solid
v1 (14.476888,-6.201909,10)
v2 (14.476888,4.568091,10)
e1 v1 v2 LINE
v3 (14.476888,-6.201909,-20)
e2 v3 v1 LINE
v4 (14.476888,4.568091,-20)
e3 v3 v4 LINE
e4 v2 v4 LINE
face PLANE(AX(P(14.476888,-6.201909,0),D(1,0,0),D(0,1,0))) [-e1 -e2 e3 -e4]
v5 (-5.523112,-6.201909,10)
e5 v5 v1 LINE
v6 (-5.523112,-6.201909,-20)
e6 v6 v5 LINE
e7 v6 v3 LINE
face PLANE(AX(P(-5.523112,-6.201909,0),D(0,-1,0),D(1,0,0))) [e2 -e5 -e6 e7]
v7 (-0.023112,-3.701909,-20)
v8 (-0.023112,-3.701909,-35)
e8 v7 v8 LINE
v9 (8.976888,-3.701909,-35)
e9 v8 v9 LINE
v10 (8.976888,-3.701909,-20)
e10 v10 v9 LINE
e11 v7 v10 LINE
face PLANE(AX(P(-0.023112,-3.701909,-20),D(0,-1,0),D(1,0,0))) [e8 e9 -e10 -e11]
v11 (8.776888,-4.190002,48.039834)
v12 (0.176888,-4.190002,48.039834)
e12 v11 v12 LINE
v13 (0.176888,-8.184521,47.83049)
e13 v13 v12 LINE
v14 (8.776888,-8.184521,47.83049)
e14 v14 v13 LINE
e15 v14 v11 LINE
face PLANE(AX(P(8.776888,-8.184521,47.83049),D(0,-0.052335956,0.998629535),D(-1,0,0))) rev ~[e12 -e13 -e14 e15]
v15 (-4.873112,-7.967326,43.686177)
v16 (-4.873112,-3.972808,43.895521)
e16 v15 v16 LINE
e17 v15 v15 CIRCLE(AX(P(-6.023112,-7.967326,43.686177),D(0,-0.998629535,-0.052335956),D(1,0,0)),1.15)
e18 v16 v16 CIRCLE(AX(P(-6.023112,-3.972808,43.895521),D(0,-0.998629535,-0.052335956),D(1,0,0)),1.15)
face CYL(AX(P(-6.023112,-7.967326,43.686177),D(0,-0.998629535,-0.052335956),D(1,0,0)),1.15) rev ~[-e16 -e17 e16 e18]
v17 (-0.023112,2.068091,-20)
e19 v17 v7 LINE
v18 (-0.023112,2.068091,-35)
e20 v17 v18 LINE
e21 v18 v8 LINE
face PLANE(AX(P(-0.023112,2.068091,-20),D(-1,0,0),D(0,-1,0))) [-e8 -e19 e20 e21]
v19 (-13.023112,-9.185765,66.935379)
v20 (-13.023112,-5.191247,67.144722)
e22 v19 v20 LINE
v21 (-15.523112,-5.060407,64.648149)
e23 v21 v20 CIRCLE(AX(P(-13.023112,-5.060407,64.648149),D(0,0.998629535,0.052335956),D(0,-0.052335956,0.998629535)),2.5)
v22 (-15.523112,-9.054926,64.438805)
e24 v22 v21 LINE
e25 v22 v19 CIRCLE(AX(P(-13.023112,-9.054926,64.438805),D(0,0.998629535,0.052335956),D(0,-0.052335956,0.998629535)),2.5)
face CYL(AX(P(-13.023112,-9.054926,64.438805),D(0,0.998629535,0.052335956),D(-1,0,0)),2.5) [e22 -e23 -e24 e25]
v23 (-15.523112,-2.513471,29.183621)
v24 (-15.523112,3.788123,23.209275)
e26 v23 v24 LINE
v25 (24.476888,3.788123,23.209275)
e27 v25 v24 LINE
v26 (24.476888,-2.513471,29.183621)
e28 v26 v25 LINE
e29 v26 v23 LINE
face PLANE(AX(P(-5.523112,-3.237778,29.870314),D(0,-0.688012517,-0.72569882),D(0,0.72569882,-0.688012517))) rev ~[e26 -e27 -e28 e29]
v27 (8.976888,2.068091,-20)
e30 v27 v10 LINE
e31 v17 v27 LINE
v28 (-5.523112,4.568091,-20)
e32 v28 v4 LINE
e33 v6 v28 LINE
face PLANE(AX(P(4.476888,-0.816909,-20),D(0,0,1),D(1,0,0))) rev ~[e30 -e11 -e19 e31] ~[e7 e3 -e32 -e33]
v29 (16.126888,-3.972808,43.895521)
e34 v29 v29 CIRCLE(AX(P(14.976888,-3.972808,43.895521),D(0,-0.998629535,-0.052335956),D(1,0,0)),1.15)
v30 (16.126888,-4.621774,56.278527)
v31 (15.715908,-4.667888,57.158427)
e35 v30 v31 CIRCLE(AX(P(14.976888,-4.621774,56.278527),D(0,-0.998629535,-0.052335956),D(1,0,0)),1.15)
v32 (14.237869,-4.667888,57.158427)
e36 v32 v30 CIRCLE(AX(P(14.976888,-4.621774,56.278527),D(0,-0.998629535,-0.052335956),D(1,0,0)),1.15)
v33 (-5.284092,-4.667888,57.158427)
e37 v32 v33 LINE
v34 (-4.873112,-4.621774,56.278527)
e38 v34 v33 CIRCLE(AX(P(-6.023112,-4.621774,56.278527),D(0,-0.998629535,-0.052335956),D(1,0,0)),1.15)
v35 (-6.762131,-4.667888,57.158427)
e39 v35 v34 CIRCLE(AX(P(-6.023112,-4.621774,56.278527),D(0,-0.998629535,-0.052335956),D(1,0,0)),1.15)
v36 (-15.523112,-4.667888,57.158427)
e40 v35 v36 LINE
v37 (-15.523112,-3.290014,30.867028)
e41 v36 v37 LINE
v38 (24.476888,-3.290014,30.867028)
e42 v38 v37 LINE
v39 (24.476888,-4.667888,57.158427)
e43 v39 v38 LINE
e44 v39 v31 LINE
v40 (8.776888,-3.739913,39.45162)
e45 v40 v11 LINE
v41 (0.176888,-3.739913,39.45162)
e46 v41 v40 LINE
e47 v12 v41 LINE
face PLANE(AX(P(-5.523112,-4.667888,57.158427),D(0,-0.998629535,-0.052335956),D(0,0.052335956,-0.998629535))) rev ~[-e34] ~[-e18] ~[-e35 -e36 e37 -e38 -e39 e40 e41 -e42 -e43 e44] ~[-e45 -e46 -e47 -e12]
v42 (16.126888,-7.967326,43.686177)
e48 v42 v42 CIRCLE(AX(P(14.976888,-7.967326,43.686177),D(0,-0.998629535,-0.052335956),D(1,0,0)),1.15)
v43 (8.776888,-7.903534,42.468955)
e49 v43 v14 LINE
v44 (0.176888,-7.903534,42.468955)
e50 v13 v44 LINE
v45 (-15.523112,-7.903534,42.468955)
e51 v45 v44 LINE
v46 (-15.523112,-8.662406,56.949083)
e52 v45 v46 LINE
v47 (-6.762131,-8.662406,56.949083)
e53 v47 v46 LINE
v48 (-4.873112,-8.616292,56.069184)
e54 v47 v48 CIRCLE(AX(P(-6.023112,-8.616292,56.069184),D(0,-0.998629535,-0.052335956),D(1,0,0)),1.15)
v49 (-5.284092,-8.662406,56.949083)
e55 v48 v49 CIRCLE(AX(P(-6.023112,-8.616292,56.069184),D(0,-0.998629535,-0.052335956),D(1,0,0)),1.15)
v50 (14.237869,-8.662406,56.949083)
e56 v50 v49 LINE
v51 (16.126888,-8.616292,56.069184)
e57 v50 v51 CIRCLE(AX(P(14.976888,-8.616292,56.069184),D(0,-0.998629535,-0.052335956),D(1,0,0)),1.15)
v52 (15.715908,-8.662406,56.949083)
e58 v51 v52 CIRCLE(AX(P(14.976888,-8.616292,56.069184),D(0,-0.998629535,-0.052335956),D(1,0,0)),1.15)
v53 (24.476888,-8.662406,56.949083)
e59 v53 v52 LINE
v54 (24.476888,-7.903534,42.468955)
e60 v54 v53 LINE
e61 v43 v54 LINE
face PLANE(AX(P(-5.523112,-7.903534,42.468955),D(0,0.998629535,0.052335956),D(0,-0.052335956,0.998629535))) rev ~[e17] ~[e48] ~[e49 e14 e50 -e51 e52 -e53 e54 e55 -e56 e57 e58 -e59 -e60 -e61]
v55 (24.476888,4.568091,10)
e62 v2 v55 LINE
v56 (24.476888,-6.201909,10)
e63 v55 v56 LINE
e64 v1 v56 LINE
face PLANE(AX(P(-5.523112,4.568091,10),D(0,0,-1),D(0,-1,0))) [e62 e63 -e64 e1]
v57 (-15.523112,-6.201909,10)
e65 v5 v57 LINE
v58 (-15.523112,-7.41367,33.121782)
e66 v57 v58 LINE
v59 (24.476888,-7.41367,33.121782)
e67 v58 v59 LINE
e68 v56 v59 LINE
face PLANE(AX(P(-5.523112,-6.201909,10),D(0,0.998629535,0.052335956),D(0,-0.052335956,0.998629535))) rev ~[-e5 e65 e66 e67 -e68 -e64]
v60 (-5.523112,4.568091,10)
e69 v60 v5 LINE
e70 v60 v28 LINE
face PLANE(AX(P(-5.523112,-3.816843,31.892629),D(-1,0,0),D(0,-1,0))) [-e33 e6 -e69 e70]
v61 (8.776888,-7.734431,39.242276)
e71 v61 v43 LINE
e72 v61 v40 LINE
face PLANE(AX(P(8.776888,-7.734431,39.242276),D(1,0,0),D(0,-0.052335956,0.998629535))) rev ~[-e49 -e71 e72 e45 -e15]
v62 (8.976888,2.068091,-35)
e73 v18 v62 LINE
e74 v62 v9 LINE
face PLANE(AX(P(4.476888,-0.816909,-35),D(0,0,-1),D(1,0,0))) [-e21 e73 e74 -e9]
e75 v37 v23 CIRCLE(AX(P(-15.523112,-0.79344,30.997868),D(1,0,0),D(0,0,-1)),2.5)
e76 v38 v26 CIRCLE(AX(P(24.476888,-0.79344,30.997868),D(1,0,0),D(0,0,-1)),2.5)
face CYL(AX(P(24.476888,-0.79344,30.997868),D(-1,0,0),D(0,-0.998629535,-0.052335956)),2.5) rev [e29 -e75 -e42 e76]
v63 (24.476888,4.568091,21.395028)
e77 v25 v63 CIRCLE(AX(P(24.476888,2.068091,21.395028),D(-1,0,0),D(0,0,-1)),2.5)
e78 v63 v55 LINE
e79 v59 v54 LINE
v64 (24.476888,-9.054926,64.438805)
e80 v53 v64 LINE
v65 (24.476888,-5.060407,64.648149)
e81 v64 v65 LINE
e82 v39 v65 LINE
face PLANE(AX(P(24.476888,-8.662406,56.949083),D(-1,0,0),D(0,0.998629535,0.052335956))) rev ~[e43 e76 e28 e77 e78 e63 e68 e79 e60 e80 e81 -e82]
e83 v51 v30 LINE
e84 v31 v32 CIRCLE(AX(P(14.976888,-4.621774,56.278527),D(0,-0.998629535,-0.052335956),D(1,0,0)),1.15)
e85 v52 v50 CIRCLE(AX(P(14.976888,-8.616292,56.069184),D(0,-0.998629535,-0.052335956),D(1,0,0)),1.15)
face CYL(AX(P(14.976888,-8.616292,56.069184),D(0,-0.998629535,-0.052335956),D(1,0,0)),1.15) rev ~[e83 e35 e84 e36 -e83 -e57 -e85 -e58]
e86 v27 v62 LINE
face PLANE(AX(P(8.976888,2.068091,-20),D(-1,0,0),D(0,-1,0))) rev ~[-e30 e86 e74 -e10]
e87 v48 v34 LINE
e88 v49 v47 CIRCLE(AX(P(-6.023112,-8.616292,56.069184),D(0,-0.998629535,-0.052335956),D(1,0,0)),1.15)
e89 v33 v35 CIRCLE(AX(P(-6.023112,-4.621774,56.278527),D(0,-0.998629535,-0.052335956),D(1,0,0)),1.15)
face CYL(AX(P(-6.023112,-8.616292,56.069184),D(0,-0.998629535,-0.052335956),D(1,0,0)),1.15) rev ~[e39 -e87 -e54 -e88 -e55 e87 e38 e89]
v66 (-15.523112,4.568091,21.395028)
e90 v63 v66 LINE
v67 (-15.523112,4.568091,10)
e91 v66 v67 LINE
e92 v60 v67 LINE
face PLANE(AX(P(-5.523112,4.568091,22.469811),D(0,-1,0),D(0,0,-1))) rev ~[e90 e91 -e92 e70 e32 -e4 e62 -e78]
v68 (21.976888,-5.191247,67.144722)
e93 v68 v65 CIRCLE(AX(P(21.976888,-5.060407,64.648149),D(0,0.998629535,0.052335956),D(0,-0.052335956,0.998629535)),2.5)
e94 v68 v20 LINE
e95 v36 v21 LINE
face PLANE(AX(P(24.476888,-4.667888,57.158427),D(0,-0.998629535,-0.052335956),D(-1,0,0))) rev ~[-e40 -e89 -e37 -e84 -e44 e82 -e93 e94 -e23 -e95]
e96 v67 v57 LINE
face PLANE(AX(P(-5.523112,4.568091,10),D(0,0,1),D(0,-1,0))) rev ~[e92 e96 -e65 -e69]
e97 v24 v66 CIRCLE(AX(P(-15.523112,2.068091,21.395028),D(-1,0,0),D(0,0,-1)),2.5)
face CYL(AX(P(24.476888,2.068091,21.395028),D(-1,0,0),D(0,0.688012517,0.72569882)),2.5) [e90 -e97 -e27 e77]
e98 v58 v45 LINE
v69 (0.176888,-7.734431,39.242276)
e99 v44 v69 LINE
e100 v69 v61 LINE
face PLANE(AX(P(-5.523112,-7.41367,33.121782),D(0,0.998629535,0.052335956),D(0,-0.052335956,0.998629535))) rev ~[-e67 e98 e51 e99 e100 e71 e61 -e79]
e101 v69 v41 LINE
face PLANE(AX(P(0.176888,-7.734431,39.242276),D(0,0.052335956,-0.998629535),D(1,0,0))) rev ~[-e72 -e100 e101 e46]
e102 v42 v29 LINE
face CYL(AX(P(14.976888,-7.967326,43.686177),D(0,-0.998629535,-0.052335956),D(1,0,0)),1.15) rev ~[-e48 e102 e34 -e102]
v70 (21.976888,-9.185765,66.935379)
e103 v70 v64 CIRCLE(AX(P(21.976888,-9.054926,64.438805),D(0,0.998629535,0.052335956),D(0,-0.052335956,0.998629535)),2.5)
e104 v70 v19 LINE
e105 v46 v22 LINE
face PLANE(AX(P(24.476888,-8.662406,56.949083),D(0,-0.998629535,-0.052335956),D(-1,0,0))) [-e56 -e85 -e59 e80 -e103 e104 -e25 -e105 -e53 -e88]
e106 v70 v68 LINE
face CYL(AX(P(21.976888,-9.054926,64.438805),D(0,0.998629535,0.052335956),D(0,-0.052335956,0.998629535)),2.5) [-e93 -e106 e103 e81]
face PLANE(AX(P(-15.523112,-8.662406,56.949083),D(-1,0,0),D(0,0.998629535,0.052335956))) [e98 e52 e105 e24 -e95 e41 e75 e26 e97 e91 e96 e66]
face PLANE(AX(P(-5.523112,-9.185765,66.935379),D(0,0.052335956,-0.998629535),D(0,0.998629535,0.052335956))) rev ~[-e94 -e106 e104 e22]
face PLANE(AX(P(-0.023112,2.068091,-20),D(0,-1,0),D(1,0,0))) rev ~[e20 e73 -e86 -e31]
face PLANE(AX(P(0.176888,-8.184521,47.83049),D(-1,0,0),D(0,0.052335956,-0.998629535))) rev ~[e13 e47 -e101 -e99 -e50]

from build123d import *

# Parameters (mm, degrees)
F0_W          = 20
F0_H          = 10.77
F1_DEPTH      = 10
F1_DEPTH_BACK = 20
F3_DEPTH      = 30
F3_DEPTH_BACK = 10
F4_DEPTH      = 10
F5_R          = 1.15
F6_DEPTH      = 25
F7_W          = 9
F7_H          = 5.77
F8_DEPTH      = 15
F9_R          = 2.5
F10_R         = 2.5


with BuildPart() as f1:
    # F0 (on Top) → F1 (new body, two sides)
    with BuildSketch(Plane.XY) as f1_sk:
        with Locations((4.4768884756, -0.816908665)):
            Rectangle(F0_W, F0_H)
    extrude(amount=F1_DEPTH)
    extrude(f1_sk.sketch, amount=-F1_DEPTH_BACK)

    # F2 (on face) → F3 (join, two sides)
    with BuildSketch(Plane(origin=(-5.5231115244, 0, 0), x_dir=(0, -1, 0), z_dir=(-1, 0, 0))) as f3_sk:
        Polygon((7.9035344876, 42.4689549124), (8.6624058531, 56.9490831664), (4.6678877141, 57.1584269913), (3.2377782985, 29.8703137532), (-4.568091335, 22.4698111415), (-4.568091335, 10), (6.201908665, 10), (7.4136699372, 33.1217824671), align=None)
    extrude(amount=-F3_DEPTH)
    extrude(f3_sk.sketch, amount=F3_DEPTH_BACK)

    # F4 (add): a face of the model
    f4_faces = [f1.faces().sort_by_distance(p)[0] for p in [
        (4.4768884756, -6.6651467836, 57.0537550789),
    ]]
    extrude(f4_faces, amount=F4_DEPTH)

    # F5 (on face) → F6 (cut)
    with BuildSketch(Plane(origin=(0, -5.6622789964, -0.2967474679), x_dir=(1, 0, 0), z_dir=(0, -0.9986295348, -0.0523359562))):
        Polygon((8.7768884756, 48.1932846266), (4.4768884756, 48.1932846266), (0.1768884756, 48.1932846266), (0.1768884756, 39.5932846266), (8.7768884756, 39.5932846266), align=None)
        with Locations((14.9768884756, 56.4432846266)):
            Circle(F5_R)
        with Locations((14.9768884756, 44.0432846266)):
            Circle(F5_R)
        with Locations((-6.0231115244, 44.0432846266)):
            Circle(F5_R)
        with Locations((-6.0231115244, 56.4432846266)):
            Circle(F5_R)
    extrude(amount=-F6_DEPTH, mode=Mode.SUBTRACT)

    # F7 (on face) → F8 (join)
    with BuildSketch(Plane(origin=(0, 0, -20), x_dir=(1, 0, 0), z_dir=(0, 0, -1))):
        with Locations((4.4768884756, 0.816908665)):
            Rectangle(F7_W, F7_H)
    extrude(amount=F8_DEPTH)

    # F9
    f9_edges = [f1.edges().sort_by_distance(p)[0] for p in [
        (-15.523112, -7.188506, 67.04005),
        (24.476888, -7.188506, 67.04005),
    ]]
    fillet(f9_edges, radius=F9_R)

    # F10
    f10_edges = [f1.edges().sort_by_distance(p)[0] for p in [
        (4.476888, -3.237778, 29.870314),
        (4.476888, 4.568091, 22.469811),
    ]]
    fillet(f10_edges, radius=F10_R)


solid = f1.part
